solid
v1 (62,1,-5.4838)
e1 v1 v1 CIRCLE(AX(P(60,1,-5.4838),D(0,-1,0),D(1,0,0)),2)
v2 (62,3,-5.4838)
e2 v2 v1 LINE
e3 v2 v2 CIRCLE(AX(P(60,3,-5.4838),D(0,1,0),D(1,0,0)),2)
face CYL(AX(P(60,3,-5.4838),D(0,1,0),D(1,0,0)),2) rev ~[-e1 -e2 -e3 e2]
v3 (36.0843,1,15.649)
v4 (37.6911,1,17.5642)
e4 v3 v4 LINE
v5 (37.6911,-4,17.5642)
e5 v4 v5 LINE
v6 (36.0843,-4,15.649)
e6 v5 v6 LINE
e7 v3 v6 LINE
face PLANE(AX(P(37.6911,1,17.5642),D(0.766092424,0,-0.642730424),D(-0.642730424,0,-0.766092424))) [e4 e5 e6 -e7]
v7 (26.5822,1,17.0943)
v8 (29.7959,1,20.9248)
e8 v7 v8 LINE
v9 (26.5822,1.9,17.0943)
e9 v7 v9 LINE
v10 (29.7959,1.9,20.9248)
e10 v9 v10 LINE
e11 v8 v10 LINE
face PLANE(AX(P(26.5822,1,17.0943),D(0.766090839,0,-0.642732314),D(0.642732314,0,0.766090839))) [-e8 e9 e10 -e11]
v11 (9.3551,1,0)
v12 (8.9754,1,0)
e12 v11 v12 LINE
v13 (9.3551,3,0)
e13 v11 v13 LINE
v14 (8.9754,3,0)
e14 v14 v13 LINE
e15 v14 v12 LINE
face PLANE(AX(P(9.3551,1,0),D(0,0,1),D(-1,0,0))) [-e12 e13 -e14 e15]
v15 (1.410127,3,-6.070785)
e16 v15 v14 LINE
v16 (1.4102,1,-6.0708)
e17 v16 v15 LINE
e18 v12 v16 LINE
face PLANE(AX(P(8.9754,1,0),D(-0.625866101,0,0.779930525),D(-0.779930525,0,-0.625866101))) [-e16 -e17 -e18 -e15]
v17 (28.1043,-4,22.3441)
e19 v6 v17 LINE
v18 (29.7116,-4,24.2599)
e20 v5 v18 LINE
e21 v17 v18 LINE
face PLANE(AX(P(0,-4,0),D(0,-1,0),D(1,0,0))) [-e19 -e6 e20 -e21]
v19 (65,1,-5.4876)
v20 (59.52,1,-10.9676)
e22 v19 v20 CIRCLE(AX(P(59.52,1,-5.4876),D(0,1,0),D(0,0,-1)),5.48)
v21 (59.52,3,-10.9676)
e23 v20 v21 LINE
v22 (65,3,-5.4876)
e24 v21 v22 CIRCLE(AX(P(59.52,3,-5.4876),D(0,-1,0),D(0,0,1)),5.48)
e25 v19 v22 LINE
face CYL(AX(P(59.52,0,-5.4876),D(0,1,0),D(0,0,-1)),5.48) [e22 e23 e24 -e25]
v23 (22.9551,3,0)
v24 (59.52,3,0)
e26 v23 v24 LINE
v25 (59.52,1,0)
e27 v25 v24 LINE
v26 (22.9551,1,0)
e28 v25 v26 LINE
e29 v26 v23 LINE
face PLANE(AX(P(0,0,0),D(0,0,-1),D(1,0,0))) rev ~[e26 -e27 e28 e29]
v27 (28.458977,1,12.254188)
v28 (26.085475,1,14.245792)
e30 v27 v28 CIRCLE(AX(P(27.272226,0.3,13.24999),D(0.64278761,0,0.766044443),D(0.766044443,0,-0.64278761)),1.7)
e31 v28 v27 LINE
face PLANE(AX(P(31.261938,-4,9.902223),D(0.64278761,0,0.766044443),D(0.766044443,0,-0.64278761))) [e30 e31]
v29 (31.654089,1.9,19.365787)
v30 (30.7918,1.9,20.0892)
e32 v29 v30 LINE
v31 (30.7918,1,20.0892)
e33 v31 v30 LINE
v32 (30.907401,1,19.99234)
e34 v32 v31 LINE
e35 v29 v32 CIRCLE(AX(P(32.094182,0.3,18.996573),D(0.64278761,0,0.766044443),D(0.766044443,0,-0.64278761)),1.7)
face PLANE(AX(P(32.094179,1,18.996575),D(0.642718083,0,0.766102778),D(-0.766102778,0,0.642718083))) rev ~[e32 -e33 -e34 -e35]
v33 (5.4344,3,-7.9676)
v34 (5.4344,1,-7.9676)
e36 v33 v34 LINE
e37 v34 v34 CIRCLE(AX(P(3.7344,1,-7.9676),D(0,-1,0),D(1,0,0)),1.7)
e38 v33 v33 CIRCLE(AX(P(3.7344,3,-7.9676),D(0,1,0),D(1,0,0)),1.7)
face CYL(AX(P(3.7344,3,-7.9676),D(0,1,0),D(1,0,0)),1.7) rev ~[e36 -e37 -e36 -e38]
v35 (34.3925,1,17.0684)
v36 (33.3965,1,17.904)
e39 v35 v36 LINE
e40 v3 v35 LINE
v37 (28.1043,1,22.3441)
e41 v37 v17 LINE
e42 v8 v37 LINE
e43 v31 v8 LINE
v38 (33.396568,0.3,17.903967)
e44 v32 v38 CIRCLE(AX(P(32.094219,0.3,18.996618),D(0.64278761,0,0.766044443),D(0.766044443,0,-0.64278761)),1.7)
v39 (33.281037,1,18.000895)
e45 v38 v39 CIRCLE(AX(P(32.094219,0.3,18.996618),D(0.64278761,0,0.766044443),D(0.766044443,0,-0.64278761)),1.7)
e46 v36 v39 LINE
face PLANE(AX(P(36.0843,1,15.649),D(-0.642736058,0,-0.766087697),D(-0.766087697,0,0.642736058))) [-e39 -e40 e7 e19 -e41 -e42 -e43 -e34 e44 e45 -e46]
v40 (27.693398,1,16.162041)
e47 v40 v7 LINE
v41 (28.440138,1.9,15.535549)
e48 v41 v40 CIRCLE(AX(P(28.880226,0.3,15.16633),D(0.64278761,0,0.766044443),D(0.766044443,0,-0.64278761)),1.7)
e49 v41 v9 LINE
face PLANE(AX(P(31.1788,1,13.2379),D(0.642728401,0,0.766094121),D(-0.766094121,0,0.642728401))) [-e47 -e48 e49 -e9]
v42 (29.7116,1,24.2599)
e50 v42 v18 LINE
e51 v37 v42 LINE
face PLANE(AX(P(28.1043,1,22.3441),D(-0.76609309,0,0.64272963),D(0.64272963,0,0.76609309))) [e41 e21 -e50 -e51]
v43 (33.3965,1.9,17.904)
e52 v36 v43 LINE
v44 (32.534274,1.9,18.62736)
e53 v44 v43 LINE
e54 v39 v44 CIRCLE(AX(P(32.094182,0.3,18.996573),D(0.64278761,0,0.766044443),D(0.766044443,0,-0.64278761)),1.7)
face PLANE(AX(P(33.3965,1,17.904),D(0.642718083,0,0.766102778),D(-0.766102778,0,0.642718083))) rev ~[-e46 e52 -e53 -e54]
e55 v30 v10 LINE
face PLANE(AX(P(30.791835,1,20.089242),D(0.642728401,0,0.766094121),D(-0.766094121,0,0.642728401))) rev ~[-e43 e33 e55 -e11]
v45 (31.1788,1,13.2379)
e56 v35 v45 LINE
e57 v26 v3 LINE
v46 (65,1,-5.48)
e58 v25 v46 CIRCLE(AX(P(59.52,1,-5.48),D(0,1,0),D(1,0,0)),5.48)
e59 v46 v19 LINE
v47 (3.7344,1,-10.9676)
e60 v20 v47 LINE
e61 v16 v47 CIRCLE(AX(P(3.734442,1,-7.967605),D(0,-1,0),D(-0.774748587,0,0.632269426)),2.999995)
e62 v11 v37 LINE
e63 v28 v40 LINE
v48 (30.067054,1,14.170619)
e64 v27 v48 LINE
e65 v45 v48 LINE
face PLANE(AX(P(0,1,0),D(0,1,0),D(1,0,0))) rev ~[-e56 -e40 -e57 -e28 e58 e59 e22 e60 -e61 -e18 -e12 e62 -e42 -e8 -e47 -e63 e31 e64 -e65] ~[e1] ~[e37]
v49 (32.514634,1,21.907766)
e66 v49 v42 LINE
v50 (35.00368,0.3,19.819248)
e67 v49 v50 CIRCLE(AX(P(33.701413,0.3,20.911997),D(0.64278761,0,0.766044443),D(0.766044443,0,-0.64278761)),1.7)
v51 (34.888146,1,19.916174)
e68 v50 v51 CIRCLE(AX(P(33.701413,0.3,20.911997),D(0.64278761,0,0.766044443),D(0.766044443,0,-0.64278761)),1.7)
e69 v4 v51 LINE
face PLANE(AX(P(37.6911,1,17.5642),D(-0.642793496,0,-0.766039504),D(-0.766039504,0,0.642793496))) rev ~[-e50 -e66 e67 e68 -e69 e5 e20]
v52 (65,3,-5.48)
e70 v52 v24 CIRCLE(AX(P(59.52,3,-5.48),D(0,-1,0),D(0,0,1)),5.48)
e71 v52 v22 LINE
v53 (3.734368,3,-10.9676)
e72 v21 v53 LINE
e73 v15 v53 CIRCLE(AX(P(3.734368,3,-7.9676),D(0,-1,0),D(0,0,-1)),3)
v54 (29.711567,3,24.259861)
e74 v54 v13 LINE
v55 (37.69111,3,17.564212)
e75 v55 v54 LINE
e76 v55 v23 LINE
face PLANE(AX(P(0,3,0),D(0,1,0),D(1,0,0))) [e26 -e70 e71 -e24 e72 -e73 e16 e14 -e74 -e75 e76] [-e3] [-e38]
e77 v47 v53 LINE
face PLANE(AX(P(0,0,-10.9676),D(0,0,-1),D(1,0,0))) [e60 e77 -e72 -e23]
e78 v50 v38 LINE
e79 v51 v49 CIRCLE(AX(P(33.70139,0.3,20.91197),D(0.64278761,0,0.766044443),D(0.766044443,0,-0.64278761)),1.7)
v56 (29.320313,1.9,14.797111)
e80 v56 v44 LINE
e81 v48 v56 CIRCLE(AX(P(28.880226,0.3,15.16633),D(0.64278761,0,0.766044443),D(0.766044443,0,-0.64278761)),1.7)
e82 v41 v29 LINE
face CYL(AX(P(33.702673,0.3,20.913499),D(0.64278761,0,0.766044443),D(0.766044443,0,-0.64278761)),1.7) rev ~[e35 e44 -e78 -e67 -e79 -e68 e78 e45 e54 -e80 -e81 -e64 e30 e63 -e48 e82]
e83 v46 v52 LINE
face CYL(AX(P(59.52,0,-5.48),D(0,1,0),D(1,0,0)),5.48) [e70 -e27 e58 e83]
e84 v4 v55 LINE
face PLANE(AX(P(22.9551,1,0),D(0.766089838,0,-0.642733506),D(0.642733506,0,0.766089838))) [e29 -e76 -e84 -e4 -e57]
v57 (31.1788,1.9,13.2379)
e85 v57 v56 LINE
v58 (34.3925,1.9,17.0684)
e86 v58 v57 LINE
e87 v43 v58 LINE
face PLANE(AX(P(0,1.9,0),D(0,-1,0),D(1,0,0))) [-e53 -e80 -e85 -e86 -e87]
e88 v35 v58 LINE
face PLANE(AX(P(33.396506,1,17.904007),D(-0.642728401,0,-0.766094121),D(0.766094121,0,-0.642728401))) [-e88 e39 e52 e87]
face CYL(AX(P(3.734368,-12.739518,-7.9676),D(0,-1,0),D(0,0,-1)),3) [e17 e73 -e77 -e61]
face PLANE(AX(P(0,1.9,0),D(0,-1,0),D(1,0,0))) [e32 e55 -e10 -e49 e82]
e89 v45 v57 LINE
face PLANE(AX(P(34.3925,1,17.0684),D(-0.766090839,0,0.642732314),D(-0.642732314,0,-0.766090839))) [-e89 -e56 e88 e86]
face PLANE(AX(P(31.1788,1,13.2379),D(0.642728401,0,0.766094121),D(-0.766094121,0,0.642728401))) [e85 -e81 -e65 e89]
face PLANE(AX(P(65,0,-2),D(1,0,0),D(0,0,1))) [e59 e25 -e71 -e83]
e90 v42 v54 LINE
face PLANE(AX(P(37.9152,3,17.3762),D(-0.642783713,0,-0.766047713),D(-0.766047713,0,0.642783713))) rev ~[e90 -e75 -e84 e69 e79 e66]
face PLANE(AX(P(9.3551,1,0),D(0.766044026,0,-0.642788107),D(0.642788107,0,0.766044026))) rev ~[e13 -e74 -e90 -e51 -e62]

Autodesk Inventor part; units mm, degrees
ref_plane "YZ Plane" through (0, 0, 0) normal (1, 0, 0) x (0, 1, 0)
ref_plane "XZ Plane" through (0, 0, 0) normal (0, 1, 0) x (-1, 0, 0)
ref_plane "XY Plane" through (0, 0, 0) normal (0, 0, 1) x (1, 0, 0)
sketch "Boceto1" plane through (0, 0, 0) normal (0, 1, 0) x (-1, 0, 0)
  line L0 (-2.031, 0) -> (-63, 0)
  line L1 (-65, -2) -> (-65, -8.0305)
  line L2 (-62.8998, -10.9676) -> (-2.0305, -10.9676)
  line L3 (0, -8.9987) -> (0, -2.031)
  line L4 (0, -8.9987) -> (0, -10.9676)
  line L5 (0, -10.9676) -> (-2.0305, -10.9676)
  line L6 (0, -2.031) -> (0, 0)
  line L7 (-65, -8.0305) -> (-65, -10.9676)
  line L8 (-65, -10.9676) -> (-62.8998, -10.9676)
  line L9 (-65, -2) -> (-65, 0)
  line L10 (-63, 0) -> (-65, 0)
  line L11 (0, 0) -> (-2.031, 0)
  dimension "d0" = 65
extrude "Extrusión1" add sketch "Boceto1" along normal blind 3
sketch "Boceto2" plane through (0, 3, 0) normal (0, 1, 0) x (1, 0, 0)
  line L0 (0, 10.9676) -> (0, 0) projected
  circle A0 centre (5, 5.4838) radius 2
  line L1 (65, 0) -> (65, 10.9676) projected
  circle A1 centre (60, 5.4838) radius 2
  line L2 (65, 5.4838) -> (60, 5.4838)
  line L3 (0, 5.4838) -> (5, 5.4838)
  point P0 (0.1384, 8.9976)
  point P1 (0.0312, 2.0308)
  point P2 (65, 2)
  point P3 (65, 8.0305)
  dimension "d20" = 5
  dimension "d31" = 4
  dimension "d32" = 4
extrude "Extrusión2" cut sketch "Boceto2" against normal blind 5
sketch "Boceto3" plane through (0, 3, 0) normal (0, 1, 0) x (1, 0, 0)
  circle A0 centre (5, 5.4838) radius 2 projected
  line L0 (5, 5.4838) -> (319.2562, 5.4838) construction
  line L1 (19.8683, -0.0721) -> (38.3706, -22.1223)
  line L2 (16.8683, -0.0721) -> (16.8078, 0)
  line L3 (11.4418, -7.1428) -> (5.4483, 0)
  line L4 (65, 0) -> (0, 0) projected
  line L5 (11.4418, -7.1428) -> (29.9441, -29.1929)
  line L6 (38.3706, -22.1223) -> (29.9441, -29.1929)
  line L7 (16.8078, 0) -> (19.8078, 0)
  line L8 (0, 0) -> (65, 0) projected
  dimension "d37" = 3
extrude "Extrusión3" add sketch "Boceto3" against normal blind 3
sketch "Boceto10" plane through (0, 3, 0) normal (0, 1, 0) x (1, 0, 0)
  line L0 (6.3645, 0) -> (-0.0991, 7.9201)
  line L1 (-0.0991, 7.9201) -> (0, 3)
  line L2 (2.4483, 0) -> (6.3645, 0)
  line L3 (65, 0) -> (0, 0) projected
  line L4 (2.4483, 0) -> (0, 0)
  line L5 (0, 0) -> (0, 3)
extrude "Extrusión9" cut sketch "Boceto10" against normal blind 39
fillet "Empalme8" radius 5.48 2 edges at (65, 1.5, 0) (65, 1.5, -10.9676)
fillet "Empalme10" radius 3 2 edges at (0, 1.5, -7.7987) (0, 1.5, -10.9676)
sketch "Boceto11" plane through (0, 3, 0) normal (0, 1, 0) x (1, 0, 0)
  line L0 (0, 0) -> (0, 10.9676) projected
  line L1 (0, 3) -> (0, 0)
  line L2 (0, 0) -> (2.4483, 0)
  line L3 (2.4483, 0) -> (0, 3) projected
  line L4 (2.4483, 0) -> (0, 3)
extrude "Extrusión10" cut sketch "Boceto11" against normal blind 57.75
sketch "Boceto13" plane through (0, 3, 0) normal (0, 1, 0) x (1, 0, 0)
  arc A0 (3.7344, 10.9676) -> (1.4102, 6.0708) centre (3.7344, 7.9676) ccw projected
  circle A1 centre (3.7344, 7.9676) radius 1.7
  point P0 (0, 0)
  dimension "d55" = 3.4
extrude "Extrusión12" cut sketch "Boceto13" against normal blind 8
sketch "Boceto14" plane through (0, 3, 0) normal (0, 1, 0) x (1, 0, 0)
  line L0 (29.4887, -24.4468) -> (8.9754, 0)
  line L1 (59.52, 0) -> (6.3645, 0) projected
  line L2 (37.9152, -17.3762) -> (23.3349, 0)
  line L3 (37.9152, -17.3762) -> (29.4887, -24.4468)
  line L4 (23.3349, 0) -> (8.9754, 0)
  point P0 (0, 0)
  point P1 (37.6687, -20.1938)
  point P2 (10.2808, 0)
extrude "Extrusión18" add sketch "Boceto14" against normal blind 2
sketch "Boceto19" plane through (0, 0, 0) normal (0, -1, 0) x (1, 0, 0)
  arc A0 (59.52, -10.9676) -> (65, -5.4876) centre (59.52, -5.4876) ccw projected
  arc A1 (1.4102, -6.0708) -> (3.7344, -10.9676) centre (3.7344, -7.9676) ccw projected
  line L0 (59.52, -10.9676) -> (3.7344, -10.9676)
  line L1 (6.3645, 0) -> (1.4102, -6.0708) projected
  line L2 (1.4102, -6.0708) -> (6.3645, 0)
  line L3 (6.3645, 0) -> (59.52, 0)
  arc A2 (59.52, -10.9676) -> (59.52, 0) centre (59.52, -5.4838) ccw
  line L4 (3.7344, -10.9676) -> (59.52, -10.9676) projected
  arc A3 (1.4102, -6.0708) -> (3.7344, -10.9676) centre (3.7344, -7.9676) ccw
  circle A4 centre (60, -5.4838) radius 2 projected
  circle A5 centre (60, -5.4838) radius 2
  circle A6 centre (3.7344, -7.9676) radius 1.7 projected
  circle A7 centre (3.7344, -7.9676) radius 1.6
  point P0 (0, 0)
extrude "Extrusión19" cut sketch "Boceto19" against normal blind 1 contours L1 L3 A2 L0 A1
sketch "Boceto20" plane through (0, 1, 0) normal (0, -1, 0) x (1, 0, 0)
  line L0 (29.4887, 24.4468) -> (8.9754, 0) projected
  line L1 (1.4102, -6.0708) -> (6.3645, 0) projected
  line L2 (8.9754, 0) -> (1.4102, -6.0708)
  line L3 (6.3645, 0) -> (8.9754, 0) projected
  line L4 (8.9754, 0) -> (6, 0)
  line L5 (6, 0) -> (1.4102, -6.0708)
  point P0 (0, 0)
extrude "Extrusión20" cut sketch "Boceto20" against normal blind 11.25 contours L1 L3 L2
sketch "Boceto21" plane through (0, 1, 0) normal (0, -1, 0) x (1, 0, 0)
  line L0 (29.4887, 24.4468) -> (8.9754, 0) projected
  line L1 (23.3349, 0) -> (8.9754, 0)
  line L2 (16.1551, 0) -> (22.9551, 0)
  line L3 (16.1551, 0) -> (9.3551, 0)
  line L4 (22.9551, 0) -> (37.6911, 17.5642)
  line L5 (37.9152, 17.3762) -> (29.4887, 24.4468) projected
  line L6 (37.6911, 17.5642) -> (37.9152, 17.3762)
  line L7 (23.3349, 0) -> (59.52, 0) projected
  line L8 (37.9152, 17.3762) -> (23.3349, 0)
  line L9 (23.3349, 0) -> (22.9551, 0)
  line L10 (9.3551, 0) -> (8.9754, 0)
  line L11 (9.3551, 0) -> (29.7116, 24.2599)
  line L12 (29.4887, 24.4468) -> (29.7116, 24.2599)
  point P0 (0, 0)
  dimension "d89" = 6.8
  dimension "d90" = 6.8
extrude "Extrusión21" cut sketch "Boceto21" against normal blind 11.25 contours L5 L11 L1 L0 | L5 L8 L1 L4
sketch "Boceto22" plane through (0, 1, 0) normal (0, -1, 0) x (1, 0, 0)
  line L0 (37.6911, 17.5642) -> (29.7116, 24.2599) projected
  line L1 (29.7116, 24.2599) -> (37.6911, 17.5642)
  line L2 (37.6911, 17.5642) -> (36.0843, 15.649)
  line L3 (22.9551, 0) -> (37.6911, 17.5642) projected
  line L4 (36.0843, 15.649) -> (28.1043, 22.3441)
  line L5 (28.1043, 22.3441) -> (29.7116, 24.2599)
  point P0 (0, 0)
  dimension "d94" = 2.5
extrude "Extrusión22" add sketch "Boceto22" along normal blind 5
sketch "Boceto23" plane through (37.6911, -4, 17.5642) normal (0.6427876, 0, 0.7660444) x (0.7660444, 0, -0.6427876)
  line L0 (-10.4166, 7) -> (0, 7) projected
  line L1 (-5.2083, 7) -> (-5.2081, 0)
  line L2 (-10.4164, 0) -> (0.0002, 0) projected
  line L3 (0.0002, 5) -> (-10.4164, 5) projected
  line L4 (-5.2081, 5) -> (-5.2083, 6)
  line L5 (-5.2083, 6) -> (-5.2082, 2.6)
  circle A0 centre (-5.2082, 4.3) radius 1.7
  point P0 (-17.583, 4)
  dimension "d97" = 3.4
extrude "Extrusión23" cut sketch "Boceto23" against normal blind 10
sketch "Boceto26" plane through (0, 1, 0) normal (0, -1, 0) x (1, 0, 0)
  line L0 (33.3965, 17.904) -> (30.7918, 20.0892) projected
  line L1 (32.0942, 18.9966) -> (29.7959, 20.9248)
  line L2 (29.7959, 20.9248) -> (34.3925, 17.0684)
  line L3 (36.0843, 15.649) -> (33.281, 18.0009) projected
  line L4 (34.3925, 17.0684) -> (31.1788, 13.2379)
  line L5 (31.1788, 13.2379) -> (26.5822, 17.0943)
  line L6 (26.5822, 17.0943) -> (29.7959, 20.9248)
  point P0 (0, 0)
  point P1 (30.9074, 19.9923)
  dimension "d103" = 3
  dimension "d104" = 6
  dimension "d106" = 5
extrude "Extrusión25" cut sketch "Boceto26" against normal blind 0.9
properties part number "ventilador controladora_suportV"
